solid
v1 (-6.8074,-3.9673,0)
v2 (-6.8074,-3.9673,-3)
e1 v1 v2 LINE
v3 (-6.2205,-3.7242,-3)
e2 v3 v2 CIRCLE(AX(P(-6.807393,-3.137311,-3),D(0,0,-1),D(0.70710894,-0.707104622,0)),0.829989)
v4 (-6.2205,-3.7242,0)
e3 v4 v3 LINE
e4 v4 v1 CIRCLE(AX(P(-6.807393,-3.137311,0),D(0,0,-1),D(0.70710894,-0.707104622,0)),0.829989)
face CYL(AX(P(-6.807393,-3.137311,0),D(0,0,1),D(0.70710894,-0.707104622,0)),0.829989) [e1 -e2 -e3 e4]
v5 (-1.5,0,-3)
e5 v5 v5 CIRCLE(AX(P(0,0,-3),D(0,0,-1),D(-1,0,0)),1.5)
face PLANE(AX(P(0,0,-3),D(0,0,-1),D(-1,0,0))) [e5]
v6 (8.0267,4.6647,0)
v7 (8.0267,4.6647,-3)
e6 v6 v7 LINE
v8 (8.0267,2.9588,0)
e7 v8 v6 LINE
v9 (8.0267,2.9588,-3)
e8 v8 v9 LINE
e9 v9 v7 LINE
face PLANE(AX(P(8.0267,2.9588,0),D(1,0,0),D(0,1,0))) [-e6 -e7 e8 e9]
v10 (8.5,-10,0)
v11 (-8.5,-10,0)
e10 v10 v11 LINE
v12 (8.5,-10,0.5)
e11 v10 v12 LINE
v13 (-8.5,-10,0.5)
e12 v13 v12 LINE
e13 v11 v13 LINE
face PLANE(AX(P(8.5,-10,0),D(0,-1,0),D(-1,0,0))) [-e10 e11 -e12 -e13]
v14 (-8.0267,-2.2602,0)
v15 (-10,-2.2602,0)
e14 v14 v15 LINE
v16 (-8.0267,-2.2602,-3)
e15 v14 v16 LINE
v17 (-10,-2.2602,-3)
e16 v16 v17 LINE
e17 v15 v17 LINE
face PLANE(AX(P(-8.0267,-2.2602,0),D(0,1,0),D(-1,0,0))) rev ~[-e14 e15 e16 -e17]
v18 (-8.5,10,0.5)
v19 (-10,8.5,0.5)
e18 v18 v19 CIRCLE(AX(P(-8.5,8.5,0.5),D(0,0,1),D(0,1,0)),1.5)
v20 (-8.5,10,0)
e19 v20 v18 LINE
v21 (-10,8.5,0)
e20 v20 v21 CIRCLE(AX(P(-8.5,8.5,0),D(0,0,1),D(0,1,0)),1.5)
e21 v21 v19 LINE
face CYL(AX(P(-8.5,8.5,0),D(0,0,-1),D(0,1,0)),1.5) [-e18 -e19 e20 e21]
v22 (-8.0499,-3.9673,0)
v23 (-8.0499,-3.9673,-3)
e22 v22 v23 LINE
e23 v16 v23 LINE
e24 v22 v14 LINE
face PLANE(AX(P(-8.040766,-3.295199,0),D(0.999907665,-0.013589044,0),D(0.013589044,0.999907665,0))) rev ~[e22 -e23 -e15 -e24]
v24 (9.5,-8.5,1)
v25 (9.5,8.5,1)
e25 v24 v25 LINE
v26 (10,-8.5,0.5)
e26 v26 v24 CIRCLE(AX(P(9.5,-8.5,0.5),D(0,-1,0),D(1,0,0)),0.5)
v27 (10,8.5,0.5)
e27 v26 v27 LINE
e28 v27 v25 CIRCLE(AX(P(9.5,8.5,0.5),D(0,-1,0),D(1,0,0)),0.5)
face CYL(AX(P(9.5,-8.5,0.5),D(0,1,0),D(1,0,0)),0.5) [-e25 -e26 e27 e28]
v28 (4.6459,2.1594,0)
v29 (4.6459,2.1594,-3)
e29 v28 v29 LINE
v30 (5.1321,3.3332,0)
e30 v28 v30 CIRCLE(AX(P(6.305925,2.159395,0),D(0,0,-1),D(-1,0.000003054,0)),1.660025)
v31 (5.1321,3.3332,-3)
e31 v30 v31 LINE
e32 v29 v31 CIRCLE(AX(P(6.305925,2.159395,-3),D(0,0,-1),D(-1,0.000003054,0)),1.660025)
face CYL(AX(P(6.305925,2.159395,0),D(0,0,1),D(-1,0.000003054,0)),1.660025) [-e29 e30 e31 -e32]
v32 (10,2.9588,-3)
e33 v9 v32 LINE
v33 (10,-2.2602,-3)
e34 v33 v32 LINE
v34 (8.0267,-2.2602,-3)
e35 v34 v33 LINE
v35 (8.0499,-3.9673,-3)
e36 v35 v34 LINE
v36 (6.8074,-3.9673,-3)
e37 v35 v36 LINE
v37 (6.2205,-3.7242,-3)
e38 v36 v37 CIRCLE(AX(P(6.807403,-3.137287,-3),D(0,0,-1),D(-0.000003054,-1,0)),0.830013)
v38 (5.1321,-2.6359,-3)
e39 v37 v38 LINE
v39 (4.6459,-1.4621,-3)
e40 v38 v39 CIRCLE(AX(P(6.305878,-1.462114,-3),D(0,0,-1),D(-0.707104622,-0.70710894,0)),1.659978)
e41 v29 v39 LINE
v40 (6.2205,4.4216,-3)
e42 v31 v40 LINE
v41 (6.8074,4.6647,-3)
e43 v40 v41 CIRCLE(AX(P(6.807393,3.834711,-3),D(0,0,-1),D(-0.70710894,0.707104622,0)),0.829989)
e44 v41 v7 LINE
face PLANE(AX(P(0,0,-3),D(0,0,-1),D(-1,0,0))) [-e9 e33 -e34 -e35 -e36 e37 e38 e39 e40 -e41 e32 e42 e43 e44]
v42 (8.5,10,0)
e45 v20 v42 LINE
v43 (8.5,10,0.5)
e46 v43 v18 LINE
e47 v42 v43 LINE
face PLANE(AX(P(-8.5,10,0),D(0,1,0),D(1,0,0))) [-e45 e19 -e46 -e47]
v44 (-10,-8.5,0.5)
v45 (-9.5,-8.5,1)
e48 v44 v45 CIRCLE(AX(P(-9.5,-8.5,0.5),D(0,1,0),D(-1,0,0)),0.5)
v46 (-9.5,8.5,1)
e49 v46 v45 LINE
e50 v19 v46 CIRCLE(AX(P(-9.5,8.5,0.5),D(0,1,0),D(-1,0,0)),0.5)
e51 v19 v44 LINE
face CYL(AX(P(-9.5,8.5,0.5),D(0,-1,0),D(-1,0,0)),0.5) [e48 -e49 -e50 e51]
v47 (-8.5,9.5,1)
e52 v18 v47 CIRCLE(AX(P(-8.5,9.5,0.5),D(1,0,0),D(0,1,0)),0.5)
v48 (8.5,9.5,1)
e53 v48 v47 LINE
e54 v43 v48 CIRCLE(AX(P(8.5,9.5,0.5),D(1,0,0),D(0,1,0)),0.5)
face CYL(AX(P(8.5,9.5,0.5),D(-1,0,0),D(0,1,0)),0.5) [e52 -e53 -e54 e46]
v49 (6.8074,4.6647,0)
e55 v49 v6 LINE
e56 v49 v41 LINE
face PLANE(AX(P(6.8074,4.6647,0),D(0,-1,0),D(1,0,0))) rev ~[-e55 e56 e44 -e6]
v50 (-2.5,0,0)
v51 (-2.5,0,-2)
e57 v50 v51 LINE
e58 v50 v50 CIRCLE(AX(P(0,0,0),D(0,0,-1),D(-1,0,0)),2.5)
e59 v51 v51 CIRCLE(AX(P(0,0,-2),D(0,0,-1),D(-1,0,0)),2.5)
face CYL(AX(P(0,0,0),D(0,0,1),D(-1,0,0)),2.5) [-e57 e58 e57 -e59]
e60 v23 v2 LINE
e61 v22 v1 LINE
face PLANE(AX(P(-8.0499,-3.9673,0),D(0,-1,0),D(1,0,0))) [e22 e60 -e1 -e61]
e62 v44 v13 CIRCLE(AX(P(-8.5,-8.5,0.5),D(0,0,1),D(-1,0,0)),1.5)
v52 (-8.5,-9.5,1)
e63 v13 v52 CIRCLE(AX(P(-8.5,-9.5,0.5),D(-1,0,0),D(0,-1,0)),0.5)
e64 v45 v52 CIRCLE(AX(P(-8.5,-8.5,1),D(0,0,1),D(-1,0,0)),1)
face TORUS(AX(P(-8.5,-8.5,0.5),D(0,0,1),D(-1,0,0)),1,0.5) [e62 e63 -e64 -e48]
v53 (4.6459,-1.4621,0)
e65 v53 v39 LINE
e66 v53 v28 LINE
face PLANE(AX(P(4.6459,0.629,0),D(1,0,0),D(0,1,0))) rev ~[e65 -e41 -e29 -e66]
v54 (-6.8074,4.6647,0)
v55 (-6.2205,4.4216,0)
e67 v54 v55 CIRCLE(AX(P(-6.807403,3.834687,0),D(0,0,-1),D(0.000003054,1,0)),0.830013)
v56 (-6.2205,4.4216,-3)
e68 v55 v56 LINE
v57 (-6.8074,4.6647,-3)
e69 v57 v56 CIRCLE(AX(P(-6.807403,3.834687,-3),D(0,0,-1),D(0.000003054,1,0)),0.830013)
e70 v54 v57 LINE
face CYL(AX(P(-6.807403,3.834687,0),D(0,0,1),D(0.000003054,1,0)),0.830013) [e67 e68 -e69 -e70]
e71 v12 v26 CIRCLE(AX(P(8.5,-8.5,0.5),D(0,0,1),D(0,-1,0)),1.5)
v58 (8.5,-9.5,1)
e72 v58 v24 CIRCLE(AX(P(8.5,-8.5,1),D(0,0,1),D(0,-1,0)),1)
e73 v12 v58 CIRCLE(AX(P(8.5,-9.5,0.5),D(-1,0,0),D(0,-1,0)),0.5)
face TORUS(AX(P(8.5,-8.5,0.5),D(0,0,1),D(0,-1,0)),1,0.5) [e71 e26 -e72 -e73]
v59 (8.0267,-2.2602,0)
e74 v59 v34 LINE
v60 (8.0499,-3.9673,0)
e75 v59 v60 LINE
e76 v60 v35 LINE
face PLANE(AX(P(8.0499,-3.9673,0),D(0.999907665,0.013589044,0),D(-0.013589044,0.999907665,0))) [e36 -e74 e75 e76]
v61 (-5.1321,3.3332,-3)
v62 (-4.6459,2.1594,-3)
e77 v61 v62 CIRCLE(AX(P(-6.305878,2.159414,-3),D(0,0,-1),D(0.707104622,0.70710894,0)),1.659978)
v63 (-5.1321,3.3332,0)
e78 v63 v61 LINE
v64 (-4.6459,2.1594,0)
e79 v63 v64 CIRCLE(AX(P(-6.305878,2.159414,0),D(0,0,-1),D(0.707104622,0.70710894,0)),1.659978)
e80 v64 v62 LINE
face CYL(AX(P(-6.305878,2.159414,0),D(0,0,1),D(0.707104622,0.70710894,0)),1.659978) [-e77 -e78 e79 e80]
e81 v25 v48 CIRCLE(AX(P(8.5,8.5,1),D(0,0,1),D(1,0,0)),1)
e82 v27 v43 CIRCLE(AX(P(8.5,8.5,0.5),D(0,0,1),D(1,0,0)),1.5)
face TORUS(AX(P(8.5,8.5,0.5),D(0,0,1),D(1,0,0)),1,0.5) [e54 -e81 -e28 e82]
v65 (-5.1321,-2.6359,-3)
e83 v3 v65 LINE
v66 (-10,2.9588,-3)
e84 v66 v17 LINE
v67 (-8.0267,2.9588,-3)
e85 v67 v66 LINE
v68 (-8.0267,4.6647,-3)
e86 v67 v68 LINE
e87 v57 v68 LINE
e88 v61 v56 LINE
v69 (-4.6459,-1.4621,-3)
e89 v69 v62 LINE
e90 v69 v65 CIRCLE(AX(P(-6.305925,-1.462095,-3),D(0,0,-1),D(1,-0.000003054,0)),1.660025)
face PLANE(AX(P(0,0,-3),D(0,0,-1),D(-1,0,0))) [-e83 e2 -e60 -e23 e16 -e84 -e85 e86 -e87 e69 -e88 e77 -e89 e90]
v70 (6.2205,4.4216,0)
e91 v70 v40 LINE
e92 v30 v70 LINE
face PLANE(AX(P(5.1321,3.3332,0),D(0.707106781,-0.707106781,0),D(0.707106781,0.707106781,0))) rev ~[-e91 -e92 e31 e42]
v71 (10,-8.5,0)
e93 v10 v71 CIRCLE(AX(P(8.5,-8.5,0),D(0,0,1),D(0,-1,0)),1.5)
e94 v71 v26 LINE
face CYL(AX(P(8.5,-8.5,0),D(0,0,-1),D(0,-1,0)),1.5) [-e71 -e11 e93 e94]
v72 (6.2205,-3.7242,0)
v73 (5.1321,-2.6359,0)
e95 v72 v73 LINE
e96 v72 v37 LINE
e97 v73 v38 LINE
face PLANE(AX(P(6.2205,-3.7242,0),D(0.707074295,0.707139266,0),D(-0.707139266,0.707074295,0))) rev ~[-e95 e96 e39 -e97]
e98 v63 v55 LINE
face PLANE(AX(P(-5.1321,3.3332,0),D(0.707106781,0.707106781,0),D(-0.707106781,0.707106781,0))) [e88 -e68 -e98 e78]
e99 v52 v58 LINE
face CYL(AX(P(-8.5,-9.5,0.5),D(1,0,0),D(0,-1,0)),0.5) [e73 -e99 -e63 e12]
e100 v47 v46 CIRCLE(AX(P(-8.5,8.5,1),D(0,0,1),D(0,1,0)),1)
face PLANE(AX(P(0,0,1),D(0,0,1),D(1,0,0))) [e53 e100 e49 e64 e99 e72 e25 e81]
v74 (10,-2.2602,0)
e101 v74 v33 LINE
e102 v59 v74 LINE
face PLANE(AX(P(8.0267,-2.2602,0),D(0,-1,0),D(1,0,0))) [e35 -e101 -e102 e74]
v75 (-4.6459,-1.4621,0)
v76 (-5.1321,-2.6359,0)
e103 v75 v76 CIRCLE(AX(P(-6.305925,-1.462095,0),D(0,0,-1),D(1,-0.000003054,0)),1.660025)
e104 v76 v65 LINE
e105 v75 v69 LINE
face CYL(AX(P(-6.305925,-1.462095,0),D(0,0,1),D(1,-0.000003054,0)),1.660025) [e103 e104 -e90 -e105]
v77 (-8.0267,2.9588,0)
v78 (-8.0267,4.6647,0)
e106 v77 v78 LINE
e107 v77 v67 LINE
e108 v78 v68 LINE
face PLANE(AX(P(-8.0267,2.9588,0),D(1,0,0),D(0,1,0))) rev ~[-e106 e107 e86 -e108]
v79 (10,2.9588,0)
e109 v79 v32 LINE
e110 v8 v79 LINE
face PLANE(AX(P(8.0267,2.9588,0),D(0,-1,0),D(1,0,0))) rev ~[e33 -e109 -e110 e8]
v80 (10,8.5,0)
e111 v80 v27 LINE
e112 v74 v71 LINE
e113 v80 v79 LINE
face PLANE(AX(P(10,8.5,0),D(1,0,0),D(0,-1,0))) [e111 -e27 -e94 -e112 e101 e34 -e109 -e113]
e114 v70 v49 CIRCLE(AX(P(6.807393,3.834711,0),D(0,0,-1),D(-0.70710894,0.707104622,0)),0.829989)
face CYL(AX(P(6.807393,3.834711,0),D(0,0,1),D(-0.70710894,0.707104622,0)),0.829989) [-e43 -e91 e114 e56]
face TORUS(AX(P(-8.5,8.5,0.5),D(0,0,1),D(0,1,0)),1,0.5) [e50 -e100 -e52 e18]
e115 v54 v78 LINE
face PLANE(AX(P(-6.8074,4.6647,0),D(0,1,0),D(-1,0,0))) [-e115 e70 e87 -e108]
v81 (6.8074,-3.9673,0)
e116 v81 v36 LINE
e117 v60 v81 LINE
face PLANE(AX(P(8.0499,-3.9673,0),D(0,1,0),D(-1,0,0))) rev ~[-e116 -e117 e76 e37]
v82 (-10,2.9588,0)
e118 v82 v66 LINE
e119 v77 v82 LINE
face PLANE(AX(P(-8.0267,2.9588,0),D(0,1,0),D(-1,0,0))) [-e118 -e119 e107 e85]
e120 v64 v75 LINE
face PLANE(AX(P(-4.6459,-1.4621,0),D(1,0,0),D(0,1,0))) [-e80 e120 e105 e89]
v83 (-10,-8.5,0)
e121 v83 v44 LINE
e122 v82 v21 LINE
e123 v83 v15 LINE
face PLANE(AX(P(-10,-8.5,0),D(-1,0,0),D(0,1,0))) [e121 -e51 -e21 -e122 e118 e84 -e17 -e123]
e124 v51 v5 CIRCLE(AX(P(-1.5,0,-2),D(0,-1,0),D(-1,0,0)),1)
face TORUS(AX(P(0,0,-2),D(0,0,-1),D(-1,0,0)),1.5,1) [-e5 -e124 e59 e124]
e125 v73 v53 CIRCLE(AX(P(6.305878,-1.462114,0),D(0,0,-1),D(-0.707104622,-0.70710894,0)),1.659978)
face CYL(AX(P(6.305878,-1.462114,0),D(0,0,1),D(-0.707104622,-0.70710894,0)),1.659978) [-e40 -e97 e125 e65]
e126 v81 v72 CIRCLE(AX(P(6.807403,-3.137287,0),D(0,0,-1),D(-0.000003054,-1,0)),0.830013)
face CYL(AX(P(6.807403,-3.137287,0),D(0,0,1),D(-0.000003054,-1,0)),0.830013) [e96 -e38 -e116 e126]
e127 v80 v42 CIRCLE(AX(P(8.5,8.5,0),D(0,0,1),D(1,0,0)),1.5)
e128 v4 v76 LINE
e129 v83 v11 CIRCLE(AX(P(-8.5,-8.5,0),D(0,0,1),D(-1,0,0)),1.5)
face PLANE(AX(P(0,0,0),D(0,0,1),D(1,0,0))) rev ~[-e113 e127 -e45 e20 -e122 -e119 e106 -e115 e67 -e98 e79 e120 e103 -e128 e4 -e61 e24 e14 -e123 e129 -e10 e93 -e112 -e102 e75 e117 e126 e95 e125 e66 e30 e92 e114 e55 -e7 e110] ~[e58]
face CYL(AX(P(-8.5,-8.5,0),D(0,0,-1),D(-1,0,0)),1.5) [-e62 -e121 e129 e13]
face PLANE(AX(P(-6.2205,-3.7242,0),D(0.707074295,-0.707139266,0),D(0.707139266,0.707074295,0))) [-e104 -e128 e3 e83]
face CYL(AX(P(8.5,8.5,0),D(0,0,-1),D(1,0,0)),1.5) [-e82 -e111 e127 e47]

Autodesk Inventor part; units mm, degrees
ref_plane "YZ Plane" through (0, 0, 0) normal (1, 0, 0) x (0, 1, 0)
ref_plane "XZ Plane" through (0, 0, 0) normal (0, 1, 0) x (-1, 0, 0)
ref_plane "XY Plane" through (0, 0, 0) normal (0, 0, 1) x (1, 0, 0)
sketch "Эскиз1" plane through (0, 0, 0) normal (0, 0, 1) x (1, 0, 0)
  circle A0 centre (0, 0) radius 2.5
  circle A1 centre (7.6, 7.6) radius 1.5
  circle A2 centre (-7.6, 7.6) radius 1.5
  circle A3 centre (-7.6, -7.6) radius 1.5
  circle A4 centre (7.6, -7.6) radius 1.5
  arc A5 (-8.5, 10) -> (-10, 8.5) centre (-8.5, 8.5) ccw
  line L0 (-8.5, 10) -> (8.5, 10)
  line L1 (-10, -8.5) -> (-10, 8.5)
  line L2 (-10, -8.5) -> (-10, -3.95)
  arc A6 (-10, -8.5) -> (-8.5, -10) centre (-8.5, -8.5) ccw
  line L3 (-3.95, -10) -> (-8.5, -10)
  line L4 (8.5, -10) -> (-8.5, -10)
  arc A7 (8.5, -10) -> (10, -8.5) centre (8.5, -8.5) ccw
  line L5 (10, -3.95) -> (10, -8.5)
  line L6 (10, 8.5) -> (10, -8.5)
  arc A8 (10, 8.5) -> (8.5, 10) centre (8.5, 8.5) ccw
  line L7 (3.95, 10) -> (8.5, 10)
extrude "Выдавливание1" add sketch "Эскиз1" along normal blind 1 contours A0 | A1 | A2 | A3 | A4 | L0 A8 L6 L5 A7 L4 L3 A6 L1 A5
fillet "Сопряжение1" radius 0.5 8 edges at (-9.5607, -9.5607, 1) (0, -10, 1) (9.5607, -9.5607, 1) (10, -6.225, 1) (9.5607, 9.5607, 1) (6.225, 10, 1) (-9.5607, 9.5607, 1) (-10, -6.225, 1)
sketch "Эскиз2" plane through (0, 0, 0) normal (0, 0, -1) x (-1, 0, 0)
  circle A0 centre (0, 0) radius 2.5
extrude "Выдавливание2" add sketch "Эскиз2" along normal blind 3
fillet "Сопряжение2" radius 1 1 edges at (2.5, 0, -3)
sketch "Эскиз3" plane through (0, 0, 0) normal (0, 0, -1) x (-1, 0, 0)
  line L0 (-10, -8.5) -> (-10, 8.5) projected
  line L1 (0, 0) -> (0, -8.5)
  arc A0 (6.2205, -3.7242) -> (6.8074, -3.9673) centre (6.8074, -3.1373) ccw
  line L2 (8.0499, -3.9673) -> (6.8074, -3.9673)
  line L3 (8.0267, -3.2811) -> (8.0407, -3.2952)
  line L4 (4.6459, 0.629) -> (4.6459, 2.1594)
  arc A1 (5.1321, 3.3332) -> (4.6459, 2.1594) centre (6.3059, 2.1594) ccw
  line L5 (6.8074, 4.6647) -> (8.0267, 4.6647)
  line L6 (6.2205, -3.7242) -> (5.1321, -2.6359)
  arc A2 (4.6459, -1.4621) -> (5.1321, -2.6359) centre (6.3059, -1.4621) ccw
  arc A3 (6.8074, 4.6647) -> (6.2205, 4.4216) centre (6.8074, 3.8347) ccw
  line L7 (5.1321, 3.3332) -> (6.2205, 4.4216)
  arc A4 (4.6459, 0.0684) -> (4.6431, 0.1025) centre (4.4384, 0.0684) ccw
  line L8 (4.6459, -1.4621) -> (4.6459, 0.629)
  arc A5 (4.6431, 0.5948) -> (4.6459, 0.629) centre (4.4384, 0.629) ccw
  line L9 (8.0499, -3.9673) -> (8.0267, -2.2602)
  line L10 (7.9913, 0.3493) -> (4.6459, 0.3493)
  line L11 (9.9996, 5.5485) -> (10, 5.5489)
  line L12 (8.0267, 2.9588) -> (8.0267, 4.6647)
  line L13 (8.0267, 2.9588) -> (10, 2.9588)
  line L14 (10, 8.5) -> (10, -8.5) projected
  line L15 (8.0267, -2.2602) -> (10, -2.2602)
  arc A6 (-6.8074, -3.9673) -> (-6.2205, -3.7242) centre (-6.8074, -3.1373) ccw
  line L16 (-8.0499, -3.9673) -> (-6.8074, -3.9673)
  line L17 (-8.0267, -3.2811) -> (-8.0407, -3.2952)
  line L18 (-6.2205, -3.7242) -> (-5.1321, -2.6359)
  arc A7 (-5.1321, -2.6359) -> (-4.6459, -1.4621) centre (-6.3059, -1.4621) ccw
  line L19 (-8.0499, -3.9673) -> (-8.0267, -2.2602)
  arc A8 (-4.6431, 0.1025) -> (-4.6459, 0.0684) centre (-4.4384, 0.0684) ccw
  line L20 (-4.6459, 0.629) -> (-4.6459, 2.1594)
  arc A9 (-4.6459, 2.1594) -> (-5.1321, 3.3332) centre (-6.3059, 2.1594) ccw
  line L21 (-6.8074, 4.6647) -> (-8.0267, 4.6647)
  line L22 (-7.9913, 0.3493) -> (-4.6459, 0.3493)
  arc A10 (-4.6459, 0.629) -> (-4.6431, 0.5948) centre (-4.4384, 0.629) ccw
  line L23 (-4.6459, -1.4621) -> (-4.6459, 0.629)
  line L24 (-9.9996, 5.5485) -> (-10, 5.5489)
  line L25 (-8.0267, 2.9588) -> (-8.0267, 4.6647)
  line L26 (-5.1321, 3.3332) -> (-6.2205, 4.4216)
  arc A11 (-6.2205, 4.4216) -> (-6.8074, 4.6647) centre (-6.8074, 3.8347) ccw
  line L27 (-8.0267, 2.9588) -> (-10, 2.9588)
  line L28 (-8.0267, -2.2602) -> (-10, -2.2602)
  point P0 (10, -4.8504)
  point P1 (-10, -4.8504)
extrude "Выдавливание3" add sketch "Эскиз3" along normal blind 3
properties part number "затычка"
